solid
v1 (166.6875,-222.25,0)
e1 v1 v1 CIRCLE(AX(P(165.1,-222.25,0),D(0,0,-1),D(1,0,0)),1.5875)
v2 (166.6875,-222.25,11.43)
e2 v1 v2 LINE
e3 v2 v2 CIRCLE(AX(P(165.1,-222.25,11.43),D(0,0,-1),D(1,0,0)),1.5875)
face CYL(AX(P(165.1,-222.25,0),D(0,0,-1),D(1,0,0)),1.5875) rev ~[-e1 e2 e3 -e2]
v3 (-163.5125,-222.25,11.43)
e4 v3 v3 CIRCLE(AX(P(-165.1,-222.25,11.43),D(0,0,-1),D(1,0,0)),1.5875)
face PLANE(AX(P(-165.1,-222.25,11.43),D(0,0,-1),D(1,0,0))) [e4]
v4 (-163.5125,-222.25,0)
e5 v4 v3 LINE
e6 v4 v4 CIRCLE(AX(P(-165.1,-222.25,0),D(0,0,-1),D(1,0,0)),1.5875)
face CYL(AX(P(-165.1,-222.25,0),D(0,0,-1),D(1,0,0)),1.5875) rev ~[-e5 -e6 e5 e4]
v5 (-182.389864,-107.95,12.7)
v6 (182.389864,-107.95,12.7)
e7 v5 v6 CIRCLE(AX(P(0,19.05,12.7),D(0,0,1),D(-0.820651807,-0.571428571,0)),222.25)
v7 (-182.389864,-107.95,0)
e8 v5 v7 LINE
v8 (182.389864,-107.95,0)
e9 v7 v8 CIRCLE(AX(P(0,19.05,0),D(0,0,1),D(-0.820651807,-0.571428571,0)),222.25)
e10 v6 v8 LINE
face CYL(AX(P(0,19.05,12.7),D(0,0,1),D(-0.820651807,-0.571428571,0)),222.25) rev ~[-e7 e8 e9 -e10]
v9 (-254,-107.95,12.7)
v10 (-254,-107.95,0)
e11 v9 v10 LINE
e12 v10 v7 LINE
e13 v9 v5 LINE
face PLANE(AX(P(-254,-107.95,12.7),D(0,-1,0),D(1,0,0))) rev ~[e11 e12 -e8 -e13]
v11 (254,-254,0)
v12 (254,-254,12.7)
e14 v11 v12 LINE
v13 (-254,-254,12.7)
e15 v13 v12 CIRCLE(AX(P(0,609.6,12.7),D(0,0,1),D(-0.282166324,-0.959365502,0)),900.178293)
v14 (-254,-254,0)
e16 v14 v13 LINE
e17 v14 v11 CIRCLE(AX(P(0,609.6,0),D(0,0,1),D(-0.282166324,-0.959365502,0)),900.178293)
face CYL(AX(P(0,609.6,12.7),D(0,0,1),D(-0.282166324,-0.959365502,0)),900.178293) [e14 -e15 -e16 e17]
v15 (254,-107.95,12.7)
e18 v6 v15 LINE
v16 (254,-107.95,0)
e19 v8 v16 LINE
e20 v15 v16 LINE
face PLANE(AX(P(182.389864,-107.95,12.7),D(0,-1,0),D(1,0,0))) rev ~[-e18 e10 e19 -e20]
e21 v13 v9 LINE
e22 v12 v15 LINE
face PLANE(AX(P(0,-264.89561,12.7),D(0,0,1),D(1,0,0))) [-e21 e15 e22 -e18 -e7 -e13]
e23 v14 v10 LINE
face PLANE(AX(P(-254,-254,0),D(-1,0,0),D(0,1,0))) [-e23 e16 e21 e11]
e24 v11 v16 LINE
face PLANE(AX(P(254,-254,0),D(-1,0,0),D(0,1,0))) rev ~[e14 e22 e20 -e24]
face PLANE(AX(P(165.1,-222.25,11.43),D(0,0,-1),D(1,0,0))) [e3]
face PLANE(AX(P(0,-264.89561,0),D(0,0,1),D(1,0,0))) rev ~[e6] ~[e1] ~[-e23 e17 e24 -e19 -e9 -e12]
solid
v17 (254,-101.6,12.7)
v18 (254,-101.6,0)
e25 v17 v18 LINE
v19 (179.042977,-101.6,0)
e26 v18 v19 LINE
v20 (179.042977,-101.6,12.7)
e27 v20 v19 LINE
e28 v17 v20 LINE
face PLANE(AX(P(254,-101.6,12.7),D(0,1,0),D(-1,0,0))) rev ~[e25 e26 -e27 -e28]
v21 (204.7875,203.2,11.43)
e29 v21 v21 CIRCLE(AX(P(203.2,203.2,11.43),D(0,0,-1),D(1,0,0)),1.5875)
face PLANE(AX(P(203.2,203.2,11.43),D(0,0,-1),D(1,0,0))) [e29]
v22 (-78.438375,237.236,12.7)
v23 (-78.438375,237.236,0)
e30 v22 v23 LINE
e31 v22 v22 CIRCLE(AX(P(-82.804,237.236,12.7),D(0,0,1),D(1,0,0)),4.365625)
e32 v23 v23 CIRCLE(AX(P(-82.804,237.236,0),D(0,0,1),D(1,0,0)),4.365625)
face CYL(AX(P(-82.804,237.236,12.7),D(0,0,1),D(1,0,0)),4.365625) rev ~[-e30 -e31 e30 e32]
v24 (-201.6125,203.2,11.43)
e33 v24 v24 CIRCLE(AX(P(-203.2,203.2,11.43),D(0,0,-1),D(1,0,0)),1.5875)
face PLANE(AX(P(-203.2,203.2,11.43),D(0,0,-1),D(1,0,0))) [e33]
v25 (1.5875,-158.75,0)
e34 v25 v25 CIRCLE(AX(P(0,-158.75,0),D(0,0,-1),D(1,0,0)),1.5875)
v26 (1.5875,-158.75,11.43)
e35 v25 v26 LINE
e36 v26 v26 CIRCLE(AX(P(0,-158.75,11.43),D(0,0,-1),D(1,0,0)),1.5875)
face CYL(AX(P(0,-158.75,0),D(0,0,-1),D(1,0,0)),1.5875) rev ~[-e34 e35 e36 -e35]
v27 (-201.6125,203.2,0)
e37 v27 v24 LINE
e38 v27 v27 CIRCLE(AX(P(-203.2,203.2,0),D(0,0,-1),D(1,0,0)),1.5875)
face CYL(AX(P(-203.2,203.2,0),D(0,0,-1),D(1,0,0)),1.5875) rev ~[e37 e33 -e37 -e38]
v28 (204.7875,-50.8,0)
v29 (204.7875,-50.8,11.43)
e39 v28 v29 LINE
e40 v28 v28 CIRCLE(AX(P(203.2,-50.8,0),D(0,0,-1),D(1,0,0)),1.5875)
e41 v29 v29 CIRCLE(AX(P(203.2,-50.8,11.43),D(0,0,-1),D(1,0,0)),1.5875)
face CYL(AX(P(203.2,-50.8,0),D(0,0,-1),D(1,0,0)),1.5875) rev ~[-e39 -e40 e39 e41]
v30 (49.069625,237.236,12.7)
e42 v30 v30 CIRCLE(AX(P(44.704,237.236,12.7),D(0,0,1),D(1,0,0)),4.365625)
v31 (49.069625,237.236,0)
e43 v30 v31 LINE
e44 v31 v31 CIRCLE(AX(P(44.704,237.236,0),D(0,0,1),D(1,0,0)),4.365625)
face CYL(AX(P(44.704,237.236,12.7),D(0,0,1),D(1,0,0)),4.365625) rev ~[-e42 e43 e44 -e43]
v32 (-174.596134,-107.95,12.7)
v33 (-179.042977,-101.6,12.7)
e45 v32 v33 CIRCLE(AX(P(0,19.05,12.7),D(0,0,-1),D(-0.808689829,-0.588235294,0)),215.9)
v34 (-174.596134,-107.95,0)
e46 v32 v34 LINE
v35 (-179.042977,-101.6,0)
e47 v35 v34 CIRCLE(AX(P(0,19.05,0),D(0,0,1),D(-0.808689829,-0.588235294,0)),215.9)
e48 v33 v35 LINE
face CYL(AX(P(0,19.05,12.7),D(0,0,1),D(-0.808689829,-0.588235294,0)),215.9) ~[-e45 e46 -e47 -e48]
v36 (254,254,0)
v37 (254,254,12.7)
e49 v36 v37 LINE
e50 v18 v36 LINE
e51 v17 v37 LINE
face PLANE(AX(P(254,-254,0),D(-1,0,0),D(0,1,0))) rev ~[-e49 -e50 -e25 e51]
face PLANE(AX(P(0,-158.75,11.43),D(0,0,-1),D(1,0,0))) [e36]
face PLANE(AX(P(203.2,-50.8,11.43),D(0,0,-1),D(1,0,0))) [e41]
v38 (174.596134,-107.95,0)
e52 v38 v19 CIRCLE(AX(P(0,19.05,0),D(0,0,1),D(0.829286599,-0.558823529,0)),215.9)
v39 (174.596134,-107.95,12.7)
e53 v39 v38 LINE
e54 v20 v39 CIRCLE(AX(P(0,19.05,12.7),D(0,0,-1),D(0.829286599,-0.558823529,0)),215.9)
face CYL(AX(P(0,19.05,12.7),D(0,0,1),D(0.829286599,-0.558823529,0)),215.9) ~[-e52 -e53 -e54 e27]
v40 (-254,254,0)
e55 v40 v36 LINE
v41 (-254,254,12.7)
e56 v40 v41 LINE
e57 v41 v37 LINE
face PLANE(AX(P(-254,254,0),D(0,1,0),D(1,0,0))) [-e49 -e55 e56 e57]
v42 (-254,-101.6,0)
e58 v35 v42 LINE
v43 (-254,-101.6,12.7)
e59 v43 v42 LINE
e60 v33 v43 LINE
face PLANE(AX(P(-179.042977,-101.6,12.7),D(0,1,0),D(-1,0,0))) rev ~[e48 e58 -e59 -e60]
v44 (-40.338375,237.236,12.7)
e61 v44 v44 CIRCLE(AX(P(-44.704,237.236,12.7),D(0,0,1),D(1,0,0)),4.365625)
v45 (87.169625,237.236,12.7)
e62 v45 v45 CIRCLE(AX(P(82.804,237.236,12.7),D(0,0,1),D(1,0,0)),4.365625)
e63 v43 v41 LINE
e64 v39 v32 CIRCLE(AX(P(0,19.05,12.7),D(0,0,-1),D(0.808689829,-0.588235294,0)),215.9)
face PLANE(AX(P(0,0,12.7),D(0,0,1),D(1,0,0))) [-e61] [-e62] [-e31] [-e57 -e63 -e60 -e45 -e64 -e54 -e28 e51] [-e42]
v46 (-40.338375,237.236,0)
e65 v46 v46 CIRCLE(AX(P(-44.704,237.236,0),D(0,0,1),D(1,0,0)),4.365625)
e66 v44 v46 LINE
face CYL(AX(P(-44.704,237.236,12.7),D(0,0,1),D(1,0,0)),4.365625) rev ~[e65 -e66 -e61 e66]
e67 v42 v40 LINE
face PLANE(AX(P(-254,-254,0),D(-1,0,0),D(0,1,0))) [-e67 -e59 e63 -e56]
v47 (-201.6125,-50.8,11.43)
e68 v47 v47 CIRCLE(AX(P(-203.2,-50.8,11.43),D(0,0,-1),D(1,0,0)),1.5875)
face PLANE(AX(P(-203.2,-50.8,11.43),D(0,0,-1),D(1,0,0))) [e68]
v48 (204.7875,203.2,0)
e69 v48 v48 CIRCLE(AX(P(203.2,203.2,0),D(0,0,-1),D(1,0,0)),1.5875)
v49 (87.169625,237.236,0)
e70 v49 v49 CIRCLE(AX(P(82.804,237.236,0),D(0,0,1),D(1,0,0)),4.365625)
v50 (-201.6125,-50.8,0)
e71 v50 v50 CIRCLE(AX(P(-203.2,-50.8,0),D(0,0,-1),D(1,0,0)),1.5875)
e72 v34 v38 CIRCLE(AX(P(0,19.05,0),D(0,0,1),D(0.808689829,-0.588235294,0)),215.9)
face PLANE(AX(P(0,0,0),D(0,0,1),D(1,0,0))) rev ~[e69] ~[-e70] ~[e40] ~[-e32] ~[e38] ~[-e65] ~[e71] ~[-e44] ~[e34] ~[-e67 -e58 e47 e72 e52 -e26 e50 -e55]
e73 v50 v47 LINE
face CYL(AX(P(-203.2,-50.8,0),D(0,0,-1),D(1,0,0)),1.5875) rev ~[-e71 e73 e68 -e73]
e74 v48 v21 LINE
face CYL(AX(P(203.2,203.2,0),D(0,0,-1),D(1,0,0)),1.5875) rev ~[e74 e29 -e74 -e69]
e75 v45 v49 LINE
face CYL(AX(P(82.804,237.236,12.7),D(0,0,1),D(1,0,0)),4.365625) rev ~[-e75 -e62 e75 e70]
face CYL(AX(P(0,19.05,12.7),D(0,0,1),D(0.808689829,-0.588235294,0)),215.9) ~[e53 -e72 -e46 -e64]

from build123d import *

# Parameters (mm, degrees)
F0_W      = 508
F0_H      = 508
F1_DEPTH  = 12.7
F3_DEPTH  = 25.4
F5_DEPTH  = 12.7
F6_R      = 1.5875
F7_DEPTH  = 11.43
F8_R      = 1.5875
F9_DEPTH  = 11.43
F10_R     = 4.365625
F11_DEPTH = 12.7


with BuildPart() as f1:
    # F0 (on Top) → F1 (new body)
    with BuildSketch(Plane.XY):
        Rectangle(F0_W, F0_H)
    extrude(amount=F1_DEPTH)

    # F2 (on face) → F3 (cut)
    with BuildSketch(Plane.XY.offset(12.7)):
        with BuildLine():
            ThreePointArc((174.5961339778, -107.95), (0, -196.85), (-174.5961339778, -107.95))
            ThreePointArc((-174.5961339778, -107.95), (-176.8480584357, -104.7949604446), (-179.0429766844, -101.6))
            Line((-179.0429766844, -101.6), (-186.6511184001, -101.6))
            Line((-186.6511184001, -101.6), (-254, -101.6))
            Line((-254, -101.6), (-254, -107.95))
            Line((-254, -107.95), (-182.3898640276, -107.95))
            ThreePointArc((-182.3898640276, -107.95), (0, -203.2), (182.3898640276, -107.95))
            Line((182.3898640276, -107.95), (254, -107.95))
            Line((254, -107.95), (254, -101.6))
            Line((254, -101.6), (186.6511184001, -101.6))
            Line((186.6511184001, -101.6), (179.0429766844, -101.6))
            ThreePointArc((179.0429766844, -101.6), (176.8480584357, -104.7949604446), (174.5961339778, -107.95))
        make_face()
    extrude(amount=-F3_DEPTH, mode=Mode.SUBTRACT)

    # F4 (on face) → F5 (join, through all)
    with BuildSketch(Plane.XY.offset(12.7)):
        with BuildLine():
            Line((254, -254), (-254, -254))
            ThreePointArc((-254, -254), (0, -290.5782934508), (254, -254))
        make_face()
    extrude(amount=-F5_DEPTH)

    # F6 (on face) → F7 (cut)
    with BuildSketch(Plane(origin=(0, 0, 0), x_dir=(1, 0, 0), z_dir=(0, 0, -1))):
        with Locations((203.2, -203.2)):
            Circle(F6_R)
        with Locations((-203.2, -203.2)):
            Circle(F6_R)
        with Locations((-203.2, 50.8)):
            Circle(F6_R)
        with Locations((203.2, 50.8)):
            Circle(F6_R)
        with Locations((0, 158.75)):
            Circle(F6_R)
    extrude(amount=-F7_DEPTH, mode=Mode.SUBTRACT)

    # F8 (on face) → F9 (cut)
    with BuildSketch(Plane(origin=(0, 0, 0), x_dir=(1, 0, 0), z_dir=(0, 0, -1))):
        with Locations((-165.1, 222.25)):
            Circle(F8_R)
        with Locations((165.1, 222.25)):
            Circle(F8_R)
    extrude(amount=-F9_DEPTH, mode=Mode.SUBTRACT)

    # F10 (on face) → F11 (cut, through all)
    with BuildSketch(Plane.XY.offset(12.7)):
        with Locations((44.704, 237.236)):
            Circle(F10_R)
        with Locations((82.804, 237.236)):
            Circle(F10_R)
        with Locations((-44.704, 237.236)):
            Circle(F10_R)
        with Locations((-82.804, 237.236)):
            Circle(F10_R)
    extrude(amount=-F11_DEPTH, mode=Mode.SUBTRACT)


solid = f1.part
